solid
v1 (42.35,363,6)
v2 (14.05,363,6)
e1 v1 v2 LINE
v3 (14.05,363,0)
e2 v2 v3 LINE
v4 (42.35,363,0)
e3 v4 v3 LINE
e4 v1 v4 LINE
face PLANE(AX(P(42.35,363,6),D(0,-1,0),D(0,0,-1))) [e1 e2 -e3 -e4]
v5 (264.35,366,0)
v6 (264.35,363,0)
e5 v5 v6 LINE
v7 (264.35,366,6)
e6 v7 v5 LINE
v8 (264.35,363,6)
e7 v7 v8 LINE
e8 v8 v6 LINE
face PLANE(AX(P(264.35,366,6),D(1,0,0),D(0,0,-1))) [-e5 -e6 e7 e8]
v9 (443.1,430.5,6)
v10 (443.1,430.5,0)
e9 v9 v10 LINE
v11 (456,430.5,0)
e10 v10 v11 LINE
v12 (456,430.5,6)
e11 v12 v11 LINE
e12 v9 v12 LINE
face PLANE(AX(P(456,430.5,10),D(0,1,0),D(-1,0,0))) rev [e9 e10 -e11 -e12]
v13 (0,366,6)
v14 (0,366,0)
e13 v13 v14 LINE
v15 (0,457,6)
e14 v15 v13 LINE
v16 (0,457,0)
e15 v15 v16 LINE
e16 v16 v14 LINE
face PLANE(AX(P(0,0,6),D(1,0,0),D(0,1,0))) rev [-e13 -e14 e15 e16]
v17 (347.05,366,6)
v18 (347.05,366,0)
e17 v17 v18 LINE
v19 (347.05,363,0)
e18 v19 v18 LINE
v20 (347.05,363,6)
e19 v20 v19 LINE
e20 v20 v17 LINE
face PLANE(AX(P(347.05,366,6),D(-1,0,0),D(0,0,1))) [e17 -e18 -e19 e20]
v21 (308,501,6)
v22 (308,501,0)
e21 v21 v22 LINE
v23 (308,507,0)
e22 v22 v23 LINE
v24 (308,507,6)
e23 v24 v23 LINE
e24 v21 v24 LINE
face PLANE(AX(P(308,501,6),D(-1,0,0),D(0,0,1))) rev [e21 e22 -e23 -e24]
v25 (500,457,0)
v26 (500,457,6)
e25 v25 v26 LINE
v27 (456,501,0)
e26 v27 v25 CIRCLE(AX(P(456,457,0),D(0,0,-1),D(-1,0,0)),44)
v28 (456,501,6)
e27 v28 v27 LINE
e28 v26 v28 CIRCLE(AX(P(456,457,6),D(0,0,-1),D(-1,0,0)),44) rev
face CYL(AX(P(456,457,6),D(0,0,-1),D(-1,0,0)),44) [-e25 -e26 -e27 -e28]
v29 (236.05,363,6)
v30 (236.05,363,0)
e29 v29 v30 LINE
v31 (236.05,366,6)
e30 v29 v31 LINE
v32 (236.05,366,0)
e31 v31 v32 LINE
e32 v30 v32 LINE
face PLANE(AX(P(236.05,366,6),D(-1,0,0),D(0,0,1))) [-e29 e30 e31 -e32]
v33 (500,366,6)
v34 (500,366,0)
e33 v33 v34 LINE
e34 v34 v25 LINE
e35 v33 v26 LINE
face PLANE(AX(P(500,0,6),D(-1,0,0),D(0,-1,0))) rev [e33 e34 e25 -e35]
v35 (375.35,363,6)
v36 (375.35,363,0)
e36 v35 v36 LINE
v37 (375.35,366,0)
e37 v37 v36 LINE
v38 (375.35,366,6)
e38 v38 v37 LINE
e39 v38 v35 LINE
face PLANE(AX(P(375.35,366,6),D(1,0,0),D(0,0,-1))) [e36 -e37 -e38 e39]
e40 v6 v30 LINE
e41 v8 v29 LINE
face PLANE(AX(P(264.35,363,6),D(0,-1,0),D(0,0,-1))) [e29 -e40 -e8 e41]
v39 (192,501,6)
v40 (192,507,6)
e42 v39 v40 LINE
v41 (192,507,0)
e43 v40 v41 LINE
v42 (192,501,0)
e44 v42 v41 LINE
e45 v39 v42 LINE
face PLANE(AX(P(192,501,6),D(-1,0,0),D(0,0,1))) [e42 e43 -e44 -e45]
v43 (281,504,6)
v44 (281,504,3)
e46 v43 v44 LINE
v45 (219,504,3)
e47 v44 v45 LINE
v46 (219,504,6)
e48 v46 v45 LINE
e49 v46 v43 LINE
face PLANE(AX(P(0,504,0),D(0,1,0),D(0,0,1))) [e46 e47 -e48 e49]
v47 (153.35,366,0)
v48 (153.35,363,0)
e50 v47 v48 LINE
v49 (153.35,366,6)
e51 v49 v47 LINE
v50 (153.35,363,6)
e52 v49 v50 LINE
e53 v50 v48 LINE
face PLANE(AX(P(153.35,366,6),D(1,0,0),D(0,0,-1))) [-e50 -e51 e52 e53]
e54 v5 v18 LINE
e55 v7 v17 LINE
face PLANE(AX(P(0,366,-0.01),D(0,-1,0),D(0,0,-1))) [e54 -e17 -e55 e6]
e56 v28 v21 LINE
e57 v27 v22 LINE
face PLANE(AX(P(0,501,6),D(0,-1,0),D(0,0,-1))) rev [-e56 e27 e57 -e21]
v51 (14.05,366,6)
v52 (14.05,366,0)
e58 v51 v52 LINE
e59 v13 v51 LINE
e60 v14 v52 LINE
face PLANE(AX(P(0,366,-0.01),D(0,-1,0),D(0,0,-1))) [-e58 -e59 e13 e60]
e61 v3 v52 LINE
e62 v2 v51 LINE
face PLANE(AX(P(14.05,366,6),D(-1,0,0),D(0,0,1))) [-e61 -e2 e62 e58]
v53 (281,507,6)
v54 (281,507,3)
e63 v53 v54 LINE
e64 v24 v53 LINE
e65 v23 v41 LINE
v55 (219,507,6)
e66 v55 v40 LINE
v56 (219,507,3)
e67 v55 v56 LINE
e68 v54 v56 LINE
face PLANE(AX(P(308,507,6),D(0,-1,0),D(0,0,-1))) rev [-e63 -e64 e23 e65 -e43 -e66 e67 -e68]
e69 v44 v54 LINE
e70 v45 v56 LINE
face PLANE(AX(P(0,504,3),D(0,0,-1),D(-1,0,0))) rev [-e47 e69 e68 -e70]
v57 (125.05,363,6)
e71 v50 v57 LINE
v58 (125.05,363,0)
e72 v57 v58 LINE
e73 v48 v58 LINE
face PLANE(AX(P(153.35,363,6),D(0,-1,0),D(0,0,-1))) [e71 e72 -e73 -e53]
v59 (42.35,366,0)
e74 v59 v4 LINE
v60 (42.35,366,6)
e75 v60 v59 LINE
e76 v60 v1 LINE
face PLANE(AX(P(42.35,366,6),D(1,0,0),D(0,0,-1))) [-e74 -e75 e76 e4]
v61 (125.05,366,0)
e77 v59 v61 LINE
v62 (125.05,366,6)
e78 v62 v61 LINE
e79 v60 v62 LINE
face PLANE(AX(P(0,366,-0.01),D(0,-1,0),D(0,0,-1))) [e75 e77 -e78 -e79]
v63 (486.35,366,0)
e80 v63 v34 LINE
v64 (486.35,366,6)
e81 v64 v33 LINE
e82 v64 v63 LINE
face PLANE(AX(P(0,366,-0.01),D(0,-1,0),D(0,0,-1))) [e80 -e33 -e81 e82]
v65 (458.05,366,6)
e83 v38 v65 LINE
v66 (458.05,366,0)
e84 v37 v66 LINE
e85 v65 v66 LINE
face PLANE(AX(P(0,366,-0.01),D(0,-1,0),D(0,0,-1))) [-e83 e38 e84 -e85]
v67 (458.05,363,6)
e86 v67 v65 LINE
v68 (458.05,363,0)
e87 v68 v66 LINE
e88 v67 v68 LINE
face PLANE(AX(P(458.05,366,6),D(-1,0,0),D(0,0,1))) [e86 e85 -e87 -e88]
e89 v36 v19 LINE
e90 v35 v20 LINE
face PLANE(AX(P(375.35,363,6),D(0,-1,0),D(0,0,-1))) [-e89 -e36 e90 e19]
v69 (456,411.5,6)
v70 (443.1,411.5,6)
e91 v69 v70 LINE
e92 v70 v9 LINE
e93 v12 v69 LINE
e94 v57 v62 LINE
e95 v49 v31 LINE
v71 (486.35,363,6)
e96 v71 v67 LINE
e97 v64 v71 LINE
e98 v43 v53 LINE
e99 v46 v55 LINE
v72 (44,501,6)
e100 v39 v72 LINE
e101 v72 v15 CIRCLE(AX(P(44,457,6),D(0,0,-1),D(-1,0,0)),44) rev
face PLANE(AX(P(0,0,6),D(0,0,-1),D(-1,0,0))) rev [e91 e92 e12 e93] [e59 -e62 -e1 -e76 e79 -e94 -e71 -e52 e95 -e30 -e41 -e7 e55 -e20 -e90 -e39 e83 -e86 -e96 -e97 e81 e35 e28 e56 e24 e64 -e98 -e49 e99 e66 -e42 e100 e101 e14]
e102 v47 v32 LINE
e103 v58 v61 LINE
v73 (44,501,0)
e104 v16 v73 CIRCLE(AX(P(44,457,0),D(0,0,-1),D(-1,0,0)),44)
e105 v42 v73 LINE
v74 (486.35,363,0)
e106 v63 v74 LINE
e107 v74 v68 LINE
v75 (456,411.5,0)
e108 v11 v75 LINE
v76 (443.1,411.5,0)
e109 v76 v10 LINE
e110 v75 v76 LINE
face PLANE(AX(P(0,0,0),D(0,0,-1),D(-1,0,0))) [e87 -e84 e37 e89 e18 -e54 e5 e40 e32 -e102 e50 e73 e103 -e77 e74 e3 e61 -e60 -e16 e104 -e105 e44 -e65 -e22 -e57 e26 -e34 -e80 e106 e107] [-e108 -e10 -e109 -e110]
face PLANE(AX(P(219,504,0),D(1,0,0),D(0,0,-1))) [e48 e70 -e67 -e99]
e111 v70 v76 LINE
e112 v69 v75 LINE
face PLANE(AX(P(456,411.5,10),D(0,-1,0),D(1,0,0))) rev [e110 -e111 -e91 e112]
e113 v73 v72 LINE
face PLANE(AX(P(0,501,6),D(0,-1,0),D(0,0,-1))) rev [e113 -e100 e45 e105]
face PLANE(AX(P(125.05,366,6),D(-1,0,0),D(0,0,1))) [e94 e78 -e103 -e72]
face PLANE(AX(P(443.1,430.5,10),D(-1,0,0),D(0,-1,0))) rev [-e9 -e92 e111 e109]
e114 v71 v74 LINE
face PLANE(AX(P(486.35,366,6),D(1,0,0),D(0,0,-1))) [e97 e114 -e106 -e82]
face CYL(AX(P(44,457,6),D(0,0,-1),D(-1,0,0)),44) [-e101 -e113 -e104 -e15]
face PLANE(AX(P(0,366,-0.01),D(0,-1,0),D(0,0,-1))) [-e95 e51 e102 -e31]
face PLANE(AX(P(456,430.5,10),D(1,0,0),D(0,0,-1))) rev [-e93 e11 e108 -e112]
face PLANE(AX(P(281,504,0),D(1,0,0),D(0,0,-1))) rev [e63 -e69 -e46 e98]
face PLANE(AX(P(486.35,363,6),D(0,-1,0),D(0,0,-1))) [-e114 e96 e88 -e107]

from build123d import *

# Parameters (mm, degrees)
STOCK_BACK_1_OUTLINE_W = 12.9
STOCK_BACK_1_OUTLINE_H = 19
STOCK_BACK_1_DEPTH     = 6
SKETCH2_W              = 28.3
SKETCH2_H              = 3
BOSS_EXTRUDE2_DEPTH    = 6
LPATTERN2_COUNT        = 5
LPATTERN2_PITCH        = 111
SKETCH3_W              = 116
SKETCH3_H              = 6
BOSS_EXTRUDE4_DEPTH    = 6
CUT_EXTRUDE1_DEPTH     = 3


# Read off the part's stored shape, not the designer's step: Stock-Back-1
with BuildPart() as part:
    # Stock-Back-1 outline → Stock-Back-1 (new body)
    with BuildSketch(Plane.XY):
        with BuildLine():
            Line((0, 457), (0, 366))
            Line((0, 366), (500, 366))
            Line((500, 366), (500, 457))
            ThreePointArc((500, 457), (487.112698372, 488.112698372), (456, 501))
            Line((456, 501), (44, 501))
            ThreePointArc((44, 501), (12.887301628, 488.112698372), (0, 457))
        make_face()
        with Locations((449.55, 421)):
            Rectangle(STOCK_BACK_1_OUTLINE_W, STOCK_BACK_1_OUTLINE_H, mode=Mode.SUBTRACT)
    extrude(amount=STOCK_BACK_1_DEPTH)

    # Sketch2 → Boss-Extrude2 (add)
    with BuildSketch(Plane(origin=(0, 0, 0), x_dir=(-1, 0, 0), z_dir=(0, 0, -1))):
        with Locations((-472.2, 364.5)):
            Rectangle(SKETCH2_W, SKETCH2_H)
    boss_extrude2 = extrude(amount=-BOSS_EXTRUDE2_DEPTH)

    # LPattern2: Boss-Extrude2 ×5
    with Locations(*[(-i * LPATTERN2_PITCH, 0, 0) for i in range(1, LPATTERN2_COUNT)]):
        add(boss_extrude2)

    # Sketch3 → Boss-Extrude4 (add)
    with BuildSketch(Plane(origin=(0, 0, 0), x_dir=(-1, 0, 0), z_dir=(0, 0, -1))):
        with Locations((-250, 504)):
            Rectangle(SKETCH3_W, SKETCH3_H)
    extrude(amount=-BOSS_EXTRUDE4_DEPTH)

    # Sketch4 → Cut-Extrude1 (cut)
    with BuildSketch(Plane(origin=(0, 507, 0), x_dir=(1, 0, 0), z_dir=(0, 1, 0))):
        with BuildLine():
            Line((219, -6), (281, -6))
            Line((281, -6), (281, -5))
            ThreePointArc((281, -5), (280.414213562, -3.585786438), (279, -3))
            Line((279, -3), (221, -3))
            ThreePointArc((221, -3), (219.585786438, -3.585786438), (219, -5))
            Line((219, -5), (219, -6))
        make_face()
        with BuildLine():
            Line((219, -3), (219, -5))
            ThreePointArc((219, -5), (219.585786438, -3.585786438), (221, -3))
            Line((221, -3), (219, -3))
        make_face()
        with BuildLine():
            ThreePointArc((279, -3), (280.414213562, -3.585786438), (281, -5))
            Line((281, -5), (281, -3))
            Line((281, -3), (279, -3))
        make_face()
    extrude(amount=-CUT_EXTRUDE1_DEPTH, mode=Mode.SUBTRACT)


solid = part.part
